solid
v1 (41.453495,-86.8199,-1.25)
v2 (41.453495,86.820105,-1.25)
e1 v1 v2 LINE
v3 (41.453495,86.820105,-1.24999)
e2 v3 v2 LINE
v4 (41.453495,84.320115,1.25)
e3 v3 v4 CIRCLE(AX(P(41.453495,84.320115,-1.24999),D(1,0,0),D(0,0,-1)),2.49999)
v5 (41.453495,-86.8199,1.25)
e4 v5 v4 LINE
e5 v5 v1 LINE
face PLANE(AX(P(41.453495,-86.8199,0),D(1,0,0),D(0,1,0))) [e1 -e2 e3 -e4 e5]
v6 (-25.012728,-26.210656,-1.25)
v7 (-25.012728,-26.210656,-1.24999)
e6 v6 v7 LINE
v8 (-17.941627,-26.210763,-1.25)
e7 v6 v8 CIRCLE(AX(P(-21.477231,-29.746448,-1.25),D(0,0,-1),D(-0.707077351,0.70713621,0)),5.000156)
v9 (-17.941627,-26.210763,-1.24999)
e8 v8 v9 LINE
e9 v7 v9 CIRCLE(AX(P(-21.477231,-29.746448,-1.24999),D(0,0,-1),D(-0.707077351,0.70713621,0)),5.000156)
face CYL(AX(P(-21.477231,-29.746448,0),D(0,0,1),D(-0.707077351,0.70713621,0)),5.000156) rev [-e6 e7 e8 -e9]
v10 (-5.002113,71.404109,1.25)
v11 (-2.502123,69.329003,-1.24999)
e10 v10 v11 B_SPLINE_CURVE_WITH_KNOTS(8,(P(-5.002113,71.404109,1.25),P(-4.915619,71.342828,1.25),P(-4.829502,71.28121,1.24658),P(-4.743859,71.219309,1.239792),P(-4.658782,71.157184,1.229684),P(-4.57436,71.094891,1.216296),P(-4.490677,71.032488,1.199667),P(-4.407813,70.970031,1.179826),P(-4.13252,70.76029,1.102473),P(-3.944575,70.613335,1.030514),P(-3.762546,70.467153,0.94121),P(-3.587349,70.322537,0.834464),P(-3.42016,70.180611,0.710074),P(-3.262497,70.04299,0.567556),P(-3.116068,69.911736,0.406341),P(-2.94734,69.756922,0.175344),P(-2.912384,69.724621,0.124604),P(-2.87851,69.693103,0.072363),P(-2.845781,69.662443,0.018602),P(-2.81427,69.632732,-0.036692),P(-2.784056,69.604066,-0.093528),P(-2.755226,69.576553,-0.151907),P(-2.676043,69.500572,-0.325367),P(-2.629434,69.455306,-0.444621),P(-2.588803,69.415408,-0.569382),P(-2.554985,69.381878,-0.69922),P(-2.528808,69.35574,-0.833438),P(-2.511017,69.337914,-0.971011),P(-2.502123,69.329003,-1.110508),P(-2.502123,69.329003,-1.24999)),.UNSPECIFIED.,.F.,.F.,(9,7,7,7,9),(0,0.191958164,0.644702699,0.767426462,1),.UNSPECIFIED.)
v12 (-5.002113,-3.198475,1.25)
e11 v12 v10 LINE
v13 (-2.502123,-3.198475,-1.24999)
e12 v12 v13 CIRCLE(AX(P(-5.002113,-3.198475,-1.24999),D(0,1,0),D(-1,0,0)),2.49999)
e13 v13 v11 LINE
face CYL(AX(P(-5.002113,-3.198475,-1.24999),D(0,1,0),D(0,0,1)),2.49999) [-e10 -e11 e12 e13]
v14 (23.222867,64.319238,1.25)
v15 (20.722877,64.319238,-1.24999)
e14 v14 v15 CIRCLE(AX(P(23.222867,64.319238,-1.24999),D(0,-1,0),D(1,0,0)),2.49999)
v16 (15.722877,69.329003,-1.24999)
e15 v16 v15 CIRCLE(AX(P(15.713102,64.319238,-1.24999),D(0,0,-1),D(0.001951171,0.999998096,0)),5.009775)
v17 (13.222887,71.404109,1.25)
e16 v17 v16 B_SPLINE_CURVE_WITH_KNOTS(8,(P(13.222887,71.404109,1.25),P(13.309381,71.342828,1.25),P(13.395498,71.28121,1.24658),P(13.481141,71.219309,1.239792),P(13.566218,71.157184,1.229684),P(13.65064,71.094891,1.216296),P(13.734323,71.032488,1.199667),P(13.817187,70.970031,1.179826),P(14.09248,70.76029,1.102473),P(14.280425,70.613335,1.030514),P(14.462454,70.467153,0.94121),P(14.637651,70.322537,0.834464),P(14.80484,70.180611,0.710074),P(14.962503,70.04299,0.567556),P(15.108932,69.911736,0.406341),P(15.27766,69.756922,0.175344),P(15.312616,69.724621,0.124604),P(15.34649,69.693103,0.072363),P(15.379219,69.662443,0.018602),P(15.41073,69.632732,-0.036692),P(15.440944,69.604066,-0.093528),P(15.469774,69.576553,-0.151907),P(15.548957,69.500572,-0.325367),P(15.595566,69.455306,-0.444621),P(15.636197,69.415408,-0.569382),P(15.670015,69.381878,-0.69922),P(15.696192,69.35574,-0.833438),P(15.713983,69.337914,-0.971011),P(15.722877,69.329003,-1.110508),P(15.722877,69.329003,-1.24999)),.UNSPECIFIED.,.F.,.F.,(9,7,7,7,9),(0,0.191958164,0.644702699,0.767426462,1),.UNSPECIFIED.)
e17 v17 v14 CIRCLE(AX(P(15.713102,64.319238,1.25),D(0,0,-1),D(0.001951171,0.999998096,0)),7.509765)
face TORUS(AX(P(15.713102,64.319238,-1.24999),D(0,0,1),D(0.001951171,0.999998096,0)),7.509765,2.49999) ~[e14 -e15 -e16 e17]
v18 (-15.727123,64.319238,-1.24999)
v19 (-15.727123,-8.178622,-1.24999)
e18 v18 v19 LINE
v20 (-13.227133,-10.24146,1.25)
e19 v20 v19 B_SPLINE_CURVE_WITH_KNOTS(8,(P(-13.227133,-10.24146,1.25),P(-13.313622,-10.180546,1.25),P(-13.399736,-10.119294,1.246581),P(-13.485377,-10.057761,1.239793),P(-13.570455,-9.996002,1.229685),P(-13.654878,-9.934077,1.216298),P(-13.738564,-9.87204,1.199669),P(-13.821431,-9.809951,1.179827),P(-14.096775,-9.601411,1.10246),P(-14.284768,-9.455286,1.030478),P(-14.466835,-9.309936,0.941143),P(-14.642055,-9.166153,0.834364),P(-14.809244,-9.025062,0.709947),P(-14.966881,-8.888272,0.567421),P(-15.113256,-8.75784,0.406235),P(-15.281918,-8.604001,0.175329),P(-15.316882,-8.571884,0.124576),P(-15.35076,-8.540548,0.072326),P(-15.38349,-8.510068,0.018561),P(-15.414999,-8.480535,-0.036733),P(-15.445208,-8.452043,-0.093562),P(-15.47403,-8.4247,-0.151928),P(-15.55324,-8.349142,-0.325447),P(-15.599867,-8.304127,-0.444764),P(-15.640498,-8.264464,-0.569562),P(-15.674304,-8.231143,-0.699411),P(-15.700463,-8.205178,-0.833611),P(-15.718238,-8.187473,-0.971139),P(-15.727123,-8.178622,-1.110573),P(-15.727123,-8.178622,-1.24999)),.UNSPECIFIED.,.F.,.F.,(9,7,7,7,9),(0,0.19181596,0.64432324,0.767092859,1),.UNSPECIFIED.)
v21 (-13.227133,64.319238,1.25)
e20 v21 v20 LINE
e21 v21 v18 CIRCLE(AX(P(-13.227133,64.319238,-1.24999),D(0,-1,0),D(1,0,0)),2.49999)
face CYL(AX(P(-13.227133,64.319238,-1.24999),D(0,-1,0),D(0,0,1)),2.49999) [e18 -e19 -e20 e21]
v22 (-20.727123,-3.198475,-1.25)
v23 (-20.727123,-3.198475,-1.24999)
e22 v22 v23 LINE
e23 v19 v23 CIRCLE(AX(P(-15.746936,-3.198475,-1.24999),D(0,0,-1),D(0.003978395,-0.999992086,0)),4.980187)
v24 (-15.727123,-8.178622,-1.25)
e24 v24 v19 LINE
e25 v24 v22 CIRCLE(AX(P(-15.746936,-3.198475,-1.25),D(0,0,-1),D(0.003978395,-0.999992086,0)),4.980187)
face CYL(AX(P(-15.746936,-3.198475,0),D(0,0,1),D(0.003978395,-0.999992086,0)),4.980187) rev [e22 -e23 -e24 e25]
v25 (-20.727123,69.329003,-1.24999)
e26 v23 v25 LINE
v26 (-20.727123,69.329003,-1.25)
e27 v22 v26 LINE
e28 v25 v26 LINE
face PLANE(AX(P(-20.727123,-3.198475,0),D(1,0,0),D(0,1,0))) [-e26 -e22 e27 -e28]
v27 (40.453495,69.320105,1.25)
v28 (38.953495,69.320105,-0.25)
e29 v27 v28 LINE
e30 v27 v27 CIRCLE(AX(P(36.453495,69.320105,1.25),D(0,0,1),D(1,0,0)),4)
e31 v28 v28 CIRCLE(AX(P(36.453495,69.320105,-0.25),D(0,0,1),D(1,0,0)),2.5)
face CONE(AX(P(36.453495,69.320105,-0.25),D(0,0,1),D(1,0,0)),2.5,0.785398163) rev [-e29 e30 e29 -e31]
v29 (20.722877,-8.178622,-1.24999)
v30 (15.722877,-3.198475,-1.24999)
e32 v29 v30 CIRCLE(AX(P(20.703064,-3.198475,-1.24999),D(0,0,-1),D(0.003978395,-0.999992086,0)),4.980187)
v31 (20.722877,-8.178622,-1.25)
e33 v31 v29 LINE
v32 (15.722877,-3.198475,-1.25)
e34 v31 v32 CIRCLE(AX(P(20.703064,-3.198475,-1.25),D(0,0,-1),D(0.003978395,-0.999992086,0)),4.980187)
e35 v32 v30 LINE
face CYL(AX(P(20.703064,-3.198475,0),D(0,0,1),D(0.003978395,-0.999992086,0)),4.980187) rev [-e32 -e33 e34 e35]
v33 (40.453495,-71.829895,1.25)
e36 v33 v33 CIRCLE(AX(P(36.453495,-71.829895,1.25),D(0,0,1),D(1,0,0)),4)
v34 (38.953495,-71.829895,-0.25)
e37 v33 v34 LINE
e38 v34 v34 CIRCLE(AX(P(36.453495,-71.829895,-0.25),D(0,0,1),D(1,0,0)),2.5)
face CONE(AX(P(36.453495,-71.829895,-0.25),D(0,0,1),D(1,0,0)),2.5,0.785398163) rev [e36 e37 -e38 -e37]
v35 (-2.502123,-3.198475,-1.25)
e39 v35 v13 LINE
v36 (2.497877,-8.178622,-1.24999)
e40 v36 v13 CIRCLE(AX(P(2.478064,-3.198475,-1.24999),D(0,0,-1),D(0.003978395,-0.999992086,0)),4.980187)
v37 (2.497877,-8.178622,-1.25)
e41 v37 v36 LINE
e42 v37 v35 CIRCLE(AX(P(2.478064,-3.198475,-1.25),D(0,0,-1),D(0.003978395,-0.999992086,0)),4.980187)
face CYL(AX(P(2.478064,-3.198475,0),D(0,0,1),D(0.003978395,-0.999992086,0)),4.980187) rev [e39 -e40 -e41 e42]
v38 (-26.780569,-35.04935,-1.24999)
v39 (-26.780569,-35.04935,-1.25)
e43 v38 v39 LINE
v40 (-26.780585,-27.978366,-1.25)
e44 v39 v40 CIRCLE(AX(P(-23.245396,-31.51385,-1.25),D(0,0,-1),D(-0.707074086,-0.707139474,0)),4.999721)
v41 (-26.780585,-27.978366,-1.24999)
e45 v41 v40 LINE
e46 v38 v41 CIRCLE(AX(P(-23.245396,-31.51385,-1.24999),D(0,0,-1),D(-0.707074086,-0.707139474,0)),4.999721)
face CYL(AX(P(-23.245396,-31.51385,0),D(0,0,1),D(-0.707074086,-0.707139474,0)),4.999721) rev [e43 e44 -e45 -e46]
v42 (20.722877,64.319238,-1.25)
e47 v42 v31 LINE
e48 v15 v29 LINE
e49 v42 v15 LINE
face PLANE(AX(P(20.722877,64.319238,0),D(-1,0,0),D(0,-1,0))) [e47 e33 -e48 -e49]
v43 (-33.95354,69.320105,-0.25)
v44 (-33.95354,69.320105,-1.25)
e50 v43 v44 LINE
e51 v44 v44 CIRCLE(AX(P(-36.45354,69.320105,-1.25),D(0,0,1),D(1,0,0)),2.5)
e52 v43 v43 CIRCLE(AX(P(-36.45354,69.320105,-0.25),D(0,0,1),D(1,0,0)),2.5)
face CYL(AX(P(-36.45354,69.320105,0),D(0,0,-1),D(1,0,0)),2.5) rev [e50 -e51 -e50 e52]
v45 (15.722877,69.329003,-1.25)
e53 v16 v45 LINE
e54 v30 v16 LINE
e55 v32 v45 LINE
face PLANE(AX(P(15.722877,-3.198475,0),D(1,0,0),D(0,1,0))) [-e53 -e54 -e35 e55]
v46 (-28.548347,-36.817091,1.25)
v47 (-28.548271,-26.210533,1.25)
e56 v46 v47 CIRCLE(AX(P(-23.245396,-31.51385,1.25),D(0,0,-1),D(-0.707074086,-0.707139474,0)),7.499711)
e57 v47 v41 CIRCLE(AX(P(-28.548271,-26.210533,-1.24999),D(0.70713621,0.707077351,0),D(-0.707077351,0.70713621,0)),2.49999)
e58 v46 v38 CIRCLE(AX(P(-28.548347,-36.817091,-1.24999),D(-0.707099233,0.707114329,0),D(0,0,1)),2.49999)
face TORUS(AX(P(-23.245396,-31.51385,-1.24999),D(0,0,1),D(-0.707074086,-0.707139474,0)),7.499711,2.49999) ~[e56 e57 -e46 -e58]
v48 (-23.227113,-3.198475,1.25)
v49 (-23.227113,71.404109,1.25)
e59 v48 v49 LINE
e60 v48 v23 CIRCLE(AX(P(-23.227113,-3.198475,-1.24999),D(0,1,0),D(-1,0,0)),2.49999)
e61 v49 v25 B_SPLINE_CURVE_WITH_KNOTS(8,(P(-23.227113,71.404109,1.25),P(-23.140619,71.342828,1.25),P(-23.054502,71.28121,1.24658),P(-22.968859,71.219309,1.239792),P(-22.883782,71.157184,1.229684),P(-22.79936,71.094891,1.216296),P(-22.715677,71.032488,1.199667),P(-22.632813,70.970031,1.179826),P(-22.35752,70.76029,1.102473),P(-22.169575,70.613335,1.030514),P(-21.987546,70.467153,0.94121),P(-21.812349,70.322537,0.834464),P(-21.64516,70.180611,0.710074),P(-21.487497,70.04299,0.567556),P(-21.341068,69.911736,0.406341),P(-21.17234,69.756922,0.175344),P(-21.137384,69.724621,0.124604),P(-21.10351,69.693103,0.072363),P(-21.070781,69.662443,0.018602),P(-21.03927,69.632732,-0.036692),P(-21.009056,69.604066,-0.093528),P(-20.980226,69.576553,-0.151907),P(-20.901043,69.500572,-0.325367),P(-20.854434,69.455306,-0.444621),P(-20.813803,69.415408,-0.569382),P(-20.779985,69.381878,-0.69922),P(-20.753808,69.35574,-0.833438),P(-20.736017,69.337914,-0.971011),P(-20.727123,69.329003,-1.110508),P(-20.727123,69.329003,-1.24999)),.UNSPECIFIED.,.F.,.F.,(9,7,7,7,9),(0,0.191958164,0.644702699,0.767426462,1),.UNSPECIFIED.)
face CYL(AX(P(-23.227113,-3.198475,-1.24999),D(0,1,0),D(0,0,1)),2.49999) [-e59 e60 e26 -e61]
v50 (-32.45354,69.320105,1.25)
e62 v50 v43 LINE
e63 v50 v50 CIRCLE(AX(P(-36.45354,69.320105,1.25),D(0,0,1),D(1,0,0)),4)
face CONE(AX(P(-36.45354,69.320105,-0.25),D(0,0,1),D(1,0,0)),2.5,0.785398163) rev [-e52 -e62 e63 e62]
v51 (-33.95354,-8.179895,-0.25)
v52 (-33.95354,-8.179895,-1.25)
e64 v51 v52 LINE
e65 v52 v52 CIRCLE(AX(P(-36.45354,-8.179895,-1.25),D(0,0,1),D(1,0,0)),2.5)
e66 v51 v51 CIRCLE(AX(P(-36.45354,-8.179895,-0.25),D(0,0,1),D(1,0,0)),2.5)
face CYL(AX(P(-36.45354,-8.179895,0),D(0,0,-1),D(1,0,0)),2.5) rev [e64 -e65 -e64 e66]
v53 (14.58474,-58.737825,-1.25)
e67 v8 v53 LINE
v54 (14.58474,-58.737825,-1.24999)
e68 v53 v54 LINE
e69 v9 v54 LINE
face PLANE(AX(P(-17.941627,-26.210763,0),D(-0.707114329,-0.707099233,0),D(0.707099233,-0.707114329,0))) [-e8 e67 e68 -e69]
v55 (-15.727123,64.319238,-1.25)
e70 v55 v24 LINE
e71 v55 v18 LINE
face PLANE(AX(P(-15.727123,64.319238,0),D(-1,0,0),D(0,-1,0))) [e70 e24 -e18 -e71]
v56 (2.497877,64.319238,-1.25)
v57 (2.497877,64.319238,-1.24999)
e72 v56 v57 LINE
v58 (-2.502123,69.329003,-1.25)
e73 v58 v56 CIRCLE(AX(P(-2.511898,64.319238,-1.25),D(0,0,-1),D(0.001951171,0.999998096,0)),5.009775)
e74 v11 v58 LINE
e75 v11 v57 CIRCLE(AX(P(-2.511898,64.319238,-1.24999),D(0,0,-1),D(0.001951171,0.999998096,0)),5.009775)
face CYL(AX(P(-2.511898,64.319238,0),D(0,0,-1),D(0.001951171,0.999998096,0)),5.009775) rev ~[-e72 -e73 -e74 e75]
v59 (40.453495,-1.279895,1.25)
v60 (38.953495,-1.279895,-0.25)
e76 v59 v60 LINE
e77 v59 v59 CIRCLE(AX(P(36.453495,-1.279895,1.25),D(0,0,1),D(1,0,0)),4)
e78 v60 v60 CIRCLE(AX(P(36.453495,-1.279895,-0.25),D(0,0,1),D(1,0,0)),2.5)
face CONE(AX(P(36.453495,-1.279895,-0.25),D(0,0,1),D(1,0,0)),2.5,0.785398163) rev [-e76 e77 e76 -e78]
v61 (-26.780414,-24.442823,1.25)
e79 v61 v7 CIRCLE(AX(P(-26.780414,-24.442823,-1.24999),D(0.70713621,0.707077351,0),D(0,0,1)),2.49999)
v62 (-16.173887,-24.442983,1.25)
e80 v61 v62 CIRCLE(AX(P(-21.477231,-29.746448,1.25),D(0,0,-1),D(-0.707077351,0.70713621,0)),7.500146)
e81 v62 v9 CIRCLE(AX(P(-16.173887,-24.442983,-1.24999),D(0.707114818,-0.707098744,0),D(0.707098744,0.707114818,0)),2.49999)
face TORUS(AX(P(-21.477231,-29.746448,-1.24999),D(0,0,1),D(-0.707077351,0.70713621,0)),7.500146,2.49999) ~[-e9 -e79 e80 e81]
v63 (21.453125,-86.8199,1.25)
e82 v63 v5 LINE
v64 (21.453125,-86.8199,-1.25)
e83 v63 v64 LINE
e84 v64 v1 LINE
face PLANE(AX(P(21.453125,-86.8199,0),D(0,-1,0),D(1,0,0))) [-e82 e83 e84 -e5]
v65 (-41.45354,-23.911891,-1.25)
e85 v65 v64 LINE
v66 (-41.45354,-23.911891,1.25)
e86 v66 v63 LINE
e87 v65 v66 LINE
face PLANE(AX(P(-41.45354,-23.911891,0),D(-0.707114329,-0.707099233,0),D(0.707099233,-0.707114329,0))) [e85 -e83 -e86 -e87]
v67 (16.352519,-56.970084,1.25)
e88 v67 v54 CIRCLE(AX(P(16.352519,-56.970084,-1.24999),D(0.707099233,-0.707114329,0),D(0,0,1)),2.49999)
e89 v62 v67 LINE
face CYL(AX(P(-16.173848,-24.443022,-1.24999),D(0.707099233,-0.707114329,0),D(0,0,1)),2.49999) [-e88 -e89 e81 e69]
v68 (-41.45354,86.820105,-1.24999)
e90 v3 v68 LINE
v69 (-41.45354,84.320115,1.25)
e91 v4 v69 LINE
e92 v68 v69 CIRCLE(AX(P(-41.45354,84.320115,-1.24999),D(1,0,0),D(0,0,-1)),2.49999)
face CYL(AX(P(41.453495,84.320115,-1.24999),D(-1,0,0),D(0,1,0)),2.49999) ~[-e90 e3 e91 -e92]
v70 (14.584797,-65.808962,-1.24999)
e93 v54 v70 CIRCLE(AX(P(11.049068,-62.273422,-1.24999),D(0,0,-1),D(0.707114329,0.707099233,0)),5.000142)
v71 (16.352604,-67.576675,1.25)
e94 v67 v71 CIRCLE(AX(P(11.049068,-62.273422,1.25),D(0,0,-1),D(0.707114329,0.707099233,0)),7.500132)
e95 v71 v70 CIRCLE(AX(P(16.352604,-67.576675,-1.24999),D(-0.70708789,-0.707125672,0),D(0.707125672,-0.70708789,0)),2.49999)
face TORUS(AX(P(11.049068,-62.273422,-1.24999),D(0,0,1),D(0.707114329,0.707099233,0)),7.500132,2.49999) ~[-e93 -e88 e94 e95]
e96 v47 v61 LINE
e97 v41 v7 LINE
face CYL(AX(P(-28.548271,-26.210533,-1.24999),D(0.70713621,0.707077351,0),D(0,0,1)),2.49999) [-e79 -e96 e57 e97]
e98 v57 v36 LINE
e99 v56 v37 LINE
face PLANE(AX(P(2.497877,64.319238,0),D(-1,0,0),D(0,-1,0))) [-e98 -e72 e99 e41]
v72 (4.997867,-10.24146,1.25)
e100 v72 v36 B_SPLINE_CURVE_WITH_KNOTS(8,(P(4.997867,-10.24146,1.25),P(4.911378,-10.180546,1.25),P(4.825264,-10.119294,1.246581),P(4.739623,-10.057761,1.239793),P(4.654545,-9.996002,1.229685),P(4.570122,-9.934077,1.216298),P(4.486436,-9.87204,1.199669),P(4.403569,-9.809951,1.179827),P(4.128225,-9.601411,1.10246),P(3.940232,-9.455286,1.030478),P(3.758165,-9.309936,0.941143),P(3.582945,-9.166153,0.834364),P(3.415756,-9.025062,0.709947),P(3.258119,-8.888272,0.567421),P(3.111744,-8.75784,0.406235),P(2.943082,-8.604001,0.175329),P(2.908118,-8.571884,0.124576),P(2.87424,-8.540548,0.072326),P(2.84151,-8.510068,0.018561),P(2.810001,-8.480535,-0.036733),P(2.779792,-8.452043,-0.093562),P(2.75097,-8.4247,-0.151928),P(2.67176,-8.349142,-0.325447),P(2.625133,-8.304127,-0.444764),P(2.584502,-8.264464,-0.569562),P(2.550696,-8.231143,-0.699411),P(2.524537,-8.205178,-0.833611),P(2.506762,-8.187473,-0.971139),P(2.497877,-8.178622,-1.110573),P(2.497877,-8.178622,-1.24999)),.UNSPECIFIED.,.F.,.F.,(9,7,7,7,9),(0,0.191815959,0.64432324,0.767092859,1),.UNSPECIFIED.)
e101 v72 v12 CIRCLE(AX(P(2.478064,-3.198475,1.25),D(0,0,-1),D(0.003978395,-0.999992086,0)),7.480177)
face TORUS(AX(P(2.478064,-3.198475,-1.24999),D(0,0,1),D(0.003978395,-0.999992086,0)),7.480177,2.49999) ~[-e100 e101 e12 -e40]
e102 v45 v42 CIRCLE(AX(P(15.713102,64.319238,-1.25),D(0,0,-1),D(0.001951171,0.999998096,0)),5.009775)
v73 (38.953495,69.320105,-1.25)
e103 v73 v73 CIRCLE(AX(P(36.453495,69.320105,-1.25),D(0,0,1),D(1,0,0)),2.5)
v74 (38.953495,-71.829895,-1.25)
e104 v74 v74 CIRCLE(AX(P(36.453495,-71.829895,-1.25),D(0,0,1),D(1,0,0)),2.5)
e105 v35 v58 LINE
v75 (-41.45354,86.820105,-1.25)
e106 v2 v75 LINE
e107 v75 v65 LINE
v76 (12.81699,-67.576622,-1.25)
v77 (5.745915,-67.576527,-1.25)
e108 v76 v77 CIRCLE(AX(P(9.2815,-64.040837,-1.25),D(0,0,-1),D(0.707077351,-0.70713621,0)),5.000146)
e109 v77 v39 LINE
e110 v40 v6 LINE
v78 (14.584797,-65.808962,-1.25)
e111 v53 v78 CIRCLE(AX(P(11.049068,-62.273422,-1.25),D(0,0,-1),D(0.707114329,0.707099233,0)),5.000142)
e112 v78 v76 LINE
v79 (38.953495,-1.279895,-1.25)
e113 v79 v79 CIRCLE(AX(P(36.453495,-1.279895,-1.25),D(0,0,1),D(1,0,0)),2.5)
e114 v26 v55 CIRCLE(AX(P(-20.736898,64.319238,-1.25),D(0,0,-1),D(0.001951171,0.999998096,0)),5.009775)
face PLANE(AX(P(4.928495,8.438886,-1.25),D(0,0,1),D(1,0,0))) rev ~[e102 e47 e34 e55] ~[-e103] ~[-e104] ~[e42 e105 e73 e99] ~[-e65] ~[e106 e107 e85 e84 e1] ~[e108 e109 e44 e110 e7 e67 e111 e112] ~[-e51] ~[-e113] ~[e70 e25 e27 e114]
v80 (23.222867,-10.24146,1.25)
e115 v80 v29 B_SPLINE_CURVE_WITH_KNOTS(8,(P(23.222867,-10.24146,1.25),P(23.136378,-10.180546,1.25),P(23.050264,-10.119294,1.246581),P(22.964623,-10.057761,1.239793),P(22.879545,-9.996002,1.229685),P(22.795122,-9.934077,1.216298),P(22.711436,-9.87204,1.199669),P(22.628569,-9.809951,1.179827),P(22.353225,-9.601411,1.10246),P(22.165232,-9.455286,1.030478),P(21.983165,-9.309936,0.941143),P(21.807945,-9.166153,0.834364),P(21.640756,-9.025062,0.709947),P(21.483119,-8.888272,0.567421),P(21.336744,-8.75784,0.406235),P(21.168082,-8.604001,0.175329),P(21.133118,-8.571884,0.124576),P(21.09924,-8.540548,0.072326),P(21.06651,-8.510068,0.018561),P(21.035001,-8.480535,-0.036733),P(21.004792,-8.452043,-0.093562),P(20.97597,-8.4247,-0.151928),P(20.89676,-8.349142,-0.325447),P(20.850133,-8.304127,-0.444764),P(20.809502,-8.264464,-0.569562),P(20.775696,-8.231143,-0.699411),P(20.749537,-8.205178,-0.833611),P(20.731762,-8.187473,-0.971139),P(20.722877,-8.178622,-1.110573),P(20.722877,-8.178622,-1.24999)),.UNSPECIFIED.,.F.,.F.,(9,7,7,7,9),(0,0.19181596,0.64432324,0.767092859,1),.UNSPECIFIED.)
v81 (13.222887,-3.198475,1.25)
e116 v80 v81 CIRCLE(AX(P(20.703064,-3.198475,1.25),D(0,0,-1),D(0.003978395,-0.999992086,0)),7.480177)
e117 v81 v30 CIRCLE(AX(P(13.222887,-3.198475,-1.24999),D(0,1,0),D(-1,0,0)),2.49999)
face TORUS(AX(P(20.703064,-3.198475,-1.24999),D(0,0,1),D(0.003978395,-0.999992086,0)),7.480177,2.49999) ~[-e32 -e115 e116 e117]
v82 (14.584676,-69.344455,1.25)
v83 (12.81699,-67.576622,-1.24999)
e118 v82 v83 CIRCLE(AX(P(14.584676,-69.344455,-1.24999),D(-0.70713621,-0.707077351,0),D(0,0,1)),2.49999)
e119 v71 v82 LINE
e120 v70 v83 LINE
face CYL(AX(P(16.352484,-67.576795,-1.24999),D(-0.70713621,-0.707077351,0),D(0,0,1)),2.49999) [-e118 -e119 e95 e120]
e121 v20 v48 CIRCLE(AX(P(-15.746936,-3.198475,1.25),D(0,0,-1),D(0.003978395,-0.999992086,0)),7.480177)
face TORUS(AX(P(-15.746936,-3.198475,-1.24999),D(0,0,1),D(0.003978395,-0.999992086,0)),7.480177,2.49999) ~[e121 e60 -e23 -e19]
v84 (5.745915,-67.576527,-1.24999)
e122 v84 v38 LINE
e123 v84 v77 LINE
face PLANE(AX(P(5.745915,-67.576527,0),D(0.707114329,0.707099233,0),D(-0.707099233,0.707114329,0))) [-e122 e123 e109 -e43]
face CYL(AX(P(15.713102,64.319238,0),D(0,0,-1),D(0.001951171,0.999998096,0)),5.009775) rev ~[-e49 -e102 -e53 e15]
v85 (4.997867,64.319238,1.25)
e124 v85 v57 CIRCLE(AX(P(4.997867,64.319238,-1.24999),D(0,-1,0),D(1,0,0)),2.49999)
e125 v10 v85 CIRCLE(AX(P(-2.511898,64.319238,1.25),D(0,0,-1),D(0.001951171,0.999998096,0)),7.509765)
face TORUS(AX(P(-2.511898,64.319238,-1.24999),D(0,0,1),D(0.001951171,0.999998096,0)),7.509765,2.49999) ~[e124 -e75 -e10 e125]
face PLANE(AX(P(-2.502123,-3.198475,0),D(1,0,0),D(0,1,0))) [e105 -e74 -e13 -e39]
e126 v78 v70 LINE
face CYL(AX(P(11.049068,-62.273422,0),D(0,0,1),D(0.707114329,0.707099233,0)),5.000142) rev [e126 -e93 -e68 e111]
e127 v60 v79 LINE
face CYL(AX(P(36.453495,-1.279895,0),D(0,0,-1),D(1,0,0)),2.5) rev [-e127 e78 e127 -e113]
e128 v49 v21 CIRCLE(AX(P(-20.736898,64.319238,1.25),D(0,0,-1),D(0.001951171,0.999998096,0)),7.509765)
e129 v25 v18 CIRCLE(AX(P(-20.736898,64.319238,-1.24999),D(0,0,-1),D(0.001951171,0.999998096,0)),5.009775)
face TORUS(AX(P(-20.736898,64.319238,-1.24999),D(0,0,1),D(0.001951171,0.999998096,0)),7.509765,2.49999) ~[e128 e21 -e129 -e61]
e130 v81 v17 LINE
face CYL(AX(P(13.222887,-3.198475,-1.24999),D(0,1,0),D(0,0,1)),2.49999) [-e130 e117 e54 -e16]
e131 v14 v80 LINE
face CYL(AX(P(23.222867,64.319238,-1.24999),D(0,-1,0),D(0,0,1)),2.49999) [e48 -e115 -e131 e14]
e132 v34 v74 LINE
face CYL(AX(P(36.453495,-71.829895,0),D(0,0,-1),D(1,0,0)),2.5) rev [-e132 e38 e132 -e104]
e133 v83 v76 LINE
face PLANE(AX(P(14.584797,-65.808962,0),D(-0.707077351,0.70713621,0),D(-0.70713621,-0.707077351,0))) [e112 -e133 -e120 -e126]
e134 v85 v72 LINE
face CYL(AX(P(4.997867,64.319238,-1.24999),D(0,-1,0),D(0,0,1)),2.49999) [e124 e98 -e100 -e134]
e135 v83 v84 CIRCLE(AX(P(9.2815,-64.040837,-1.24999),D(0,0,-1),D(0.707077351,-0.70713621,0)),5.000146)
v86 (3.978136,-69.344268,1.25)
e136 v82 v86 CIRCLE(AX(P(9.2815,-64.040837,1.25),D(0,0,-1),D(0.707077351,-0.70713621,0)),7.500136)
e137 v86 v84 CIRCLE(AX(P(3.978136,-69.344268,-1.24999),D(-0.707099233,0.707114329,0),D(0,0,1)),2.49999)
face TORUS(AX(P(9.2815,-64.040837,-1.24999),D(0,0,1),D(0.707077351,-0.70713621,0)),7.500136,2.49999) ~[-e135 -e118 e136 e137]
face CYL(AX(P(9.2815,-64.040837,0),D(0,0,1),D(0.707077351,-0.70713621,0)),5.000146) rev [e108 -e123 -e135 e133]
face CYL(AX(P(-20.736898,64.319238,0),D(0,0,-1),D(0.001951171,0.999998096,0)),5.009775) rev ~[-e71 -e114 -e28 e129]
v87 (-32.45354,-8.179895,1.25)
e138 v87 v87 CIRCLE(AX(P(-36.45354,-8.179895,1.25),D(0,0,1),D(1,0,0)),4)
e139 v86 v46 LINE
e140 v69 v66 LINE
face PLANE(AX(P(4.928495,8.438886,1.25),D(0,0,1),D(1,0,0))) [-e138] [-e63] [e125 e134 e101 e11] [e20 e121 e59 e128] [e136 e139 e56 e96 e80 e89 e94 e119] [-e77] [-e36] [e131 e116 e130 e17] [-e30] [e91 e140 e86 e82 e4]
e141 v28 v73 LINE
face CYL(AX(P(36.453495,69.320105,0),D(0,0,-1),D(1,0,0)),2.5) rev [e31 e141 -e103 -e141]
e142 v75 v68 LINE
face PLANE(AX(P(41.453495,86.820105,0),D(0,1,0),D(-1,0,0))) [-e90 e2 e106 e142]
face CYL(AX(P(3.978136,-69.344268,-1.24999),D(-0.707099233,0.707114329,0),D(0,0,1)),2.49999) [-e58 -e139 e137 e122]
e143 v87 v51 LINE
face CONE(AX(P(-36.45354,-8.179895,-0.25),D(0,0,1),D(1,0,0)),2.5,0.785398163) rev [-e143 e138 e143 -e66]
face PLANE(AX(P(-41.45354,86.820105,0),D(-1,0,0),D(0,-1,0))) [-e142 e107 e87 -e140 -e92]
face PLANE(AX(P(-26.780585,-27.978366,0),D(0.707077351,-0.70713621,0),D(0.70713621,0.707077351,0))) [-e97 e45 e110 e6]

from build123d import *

# Parameters (mm, degrees)
F0_R     = 2.5
F1_DEPTH = 1.25
F2_R     = 2.49999
F3_SIZE  = 1.5


# Not quite as in the source:
# - a fillet or chamfer is up to 0.001 mm smaller than in the source, because OpenCascade refuses the exact size


with BuildPart() as f1:
    # F0 (on Top) → F1 (new body, symmetric)
    with BuildSketch(Plane.XY):
        Polygon((41.4534954924, 86.8201051839), (-41.4535404544, 86.8201051839), (-41.4535404544, -23.9118914119), (21.4531252731, -86.8199001066), (41.4534954924, -86.8199001066), align=None)
        with BuildLine():
            ThreePointArc((-25.0127278268, -26.2106563896), (-21.4771550521, -24.7462917212), (-17.9416265813, -26.210763353))
            Line((-17.9416265813, -26.210763353), (14.5847404845, -58.7378248101))
            ThreePointArc((14.5847404845, -58.7378248101), (16.0492105587, -62.2733815916), (14.5847972009, -65.8089618652))
            Line((14.5847972009, -65.8089618652), (12.816990028, -67.5766218932))
            ThreePointArc((12.816990028, -67.5766218932), (9.2814327639, -69.0409837172), (5.745914741, -67.5765271526))
            Line((5.745914741, -67.5765271526), (-26.7805685052, -35.0493495125))
            ThreePointArc((-26.7805685052, -35.0493495125), (-28.2451162288, -31.5138612573), (-26.7805848271, -27.9783662409))
            Line((-26.7805848271, -27.9783662409), (-25.0127278268, -26.2106563896))
        make_face(mode=Mode.SUBTRACT)
        with Locations((-36.4535404544, -8.1798948161)):
            Circle(F0_R, mode=Mode.SUBTRACT)
        with Locations((36.4534954924, -71.8298948161)):
            Circle(F0_R, mode=Mode.SUBTRACT)
        with Locations((36.4534954924, -1.2798948161)):
            Circle(F0_R, mode=Mode.SUBTRACT)
        with BuildLine():
            Line((-20.7271233506, -3.1984749304), (-20.7271233506, 69.3290029653))
            ThreePointArc((-20.7271233506, 69.3290029653), (-17.1909981799, 67.8582257506), (-15.7271233506, 64.3192375729))
            Line((-15.7271233506, 64.3192375729), (-15.7271233506, -8.1786223686))
            ThreePointArc((-15.7271233506, -8.1786223686), (-19.2614484064, -6.7269968768), (-20.7271233506, -3.1984749304))
        make_face(mode=Mode.SUBTRACT)
        with BuildLine():
            Line((-2.5021233506, -3.1984749304), (-2.5021233506, 69.3290029653))
            ThreePointArc((-2.5021233506, 69.3290029653), (1.0340018201, 67.8582257506), (2.4978766494, 64.3192375729))
            Line((2.4978766494, 64.3192375729), (2.4978766494, -8.1786223686))
            ThreePointArc((2.4978766494, -8.1786223686), (-1.0364484064, -6.7269968768), (-2.5021233506, -3.1984749304))
        make_face(mode=Mode.SUBTRACT)
        with Locations((-36.4535404544, 69.3201051839)):
            Circle(F0_R, mode=Mode.SUBTRACT)
        with BuildLine():
            Line((15.7228766494, -3.1984749304), (15.7228766494, 69.3290029653))
            ThreePointArc((15.7228766494, 69.3290029653), (19.2590018201, 67.8582257506), (20.7228766494, 64.3192375729))
            Line((20.7228766494, 64.3192375729), (20.7228766494, -8.1786223686))
            ThreePointArc((20.7228766494, -8.1786223686), (17.1885515936, -6.7269968768), (15.7228766494, -3.1984749304))
        make_face(mode=Mode.SUBTRACT)
        with Locations((36.4534954924, 69.3201051839)):
            Circle(F0_R, mode=Mode.SUBTRACT)
    extrude(amount=F1_DEPTH, both=True)

    # F2 (radius 2.5 in the source; OpenCascade refuses exactly that, so slightly less here)
    f2_edges = [f1.edges().sort_by_distance(p)[0] for p in [
        (-10.517327, -51.312938, 1.25),
        (-20.727123, 33.065264, 1.25),
        (-2.502123, 33.065264, 1.25),
        (15.722877, 33.065264, 1.25),
        (-17.190998, 67.858226, 1.25),
        (1.034002, 67.858226, 1.25),
        (19.259002, 67.858226, 1.25),
        (-2.2e-05, 86.820105, 1.25),
    ]]
    fillet(f2_edges, radius=F2_R)

    # F3
    f3_edges = [f1.edges().sort_by_distance(p)[0] for p in [
        (-38.95354, -8.179895, 1.25),
        (-38.95354, 69.320105, 1.25),
        (33.953495, 69.320105, 1.25),
        (33.953495, -1.279895, 1.25),
        (33.953495, -71.829895, 1.25),
    ]]
    chamfer(f3_edges, length=F3_SIZE)


solid = f1.part
